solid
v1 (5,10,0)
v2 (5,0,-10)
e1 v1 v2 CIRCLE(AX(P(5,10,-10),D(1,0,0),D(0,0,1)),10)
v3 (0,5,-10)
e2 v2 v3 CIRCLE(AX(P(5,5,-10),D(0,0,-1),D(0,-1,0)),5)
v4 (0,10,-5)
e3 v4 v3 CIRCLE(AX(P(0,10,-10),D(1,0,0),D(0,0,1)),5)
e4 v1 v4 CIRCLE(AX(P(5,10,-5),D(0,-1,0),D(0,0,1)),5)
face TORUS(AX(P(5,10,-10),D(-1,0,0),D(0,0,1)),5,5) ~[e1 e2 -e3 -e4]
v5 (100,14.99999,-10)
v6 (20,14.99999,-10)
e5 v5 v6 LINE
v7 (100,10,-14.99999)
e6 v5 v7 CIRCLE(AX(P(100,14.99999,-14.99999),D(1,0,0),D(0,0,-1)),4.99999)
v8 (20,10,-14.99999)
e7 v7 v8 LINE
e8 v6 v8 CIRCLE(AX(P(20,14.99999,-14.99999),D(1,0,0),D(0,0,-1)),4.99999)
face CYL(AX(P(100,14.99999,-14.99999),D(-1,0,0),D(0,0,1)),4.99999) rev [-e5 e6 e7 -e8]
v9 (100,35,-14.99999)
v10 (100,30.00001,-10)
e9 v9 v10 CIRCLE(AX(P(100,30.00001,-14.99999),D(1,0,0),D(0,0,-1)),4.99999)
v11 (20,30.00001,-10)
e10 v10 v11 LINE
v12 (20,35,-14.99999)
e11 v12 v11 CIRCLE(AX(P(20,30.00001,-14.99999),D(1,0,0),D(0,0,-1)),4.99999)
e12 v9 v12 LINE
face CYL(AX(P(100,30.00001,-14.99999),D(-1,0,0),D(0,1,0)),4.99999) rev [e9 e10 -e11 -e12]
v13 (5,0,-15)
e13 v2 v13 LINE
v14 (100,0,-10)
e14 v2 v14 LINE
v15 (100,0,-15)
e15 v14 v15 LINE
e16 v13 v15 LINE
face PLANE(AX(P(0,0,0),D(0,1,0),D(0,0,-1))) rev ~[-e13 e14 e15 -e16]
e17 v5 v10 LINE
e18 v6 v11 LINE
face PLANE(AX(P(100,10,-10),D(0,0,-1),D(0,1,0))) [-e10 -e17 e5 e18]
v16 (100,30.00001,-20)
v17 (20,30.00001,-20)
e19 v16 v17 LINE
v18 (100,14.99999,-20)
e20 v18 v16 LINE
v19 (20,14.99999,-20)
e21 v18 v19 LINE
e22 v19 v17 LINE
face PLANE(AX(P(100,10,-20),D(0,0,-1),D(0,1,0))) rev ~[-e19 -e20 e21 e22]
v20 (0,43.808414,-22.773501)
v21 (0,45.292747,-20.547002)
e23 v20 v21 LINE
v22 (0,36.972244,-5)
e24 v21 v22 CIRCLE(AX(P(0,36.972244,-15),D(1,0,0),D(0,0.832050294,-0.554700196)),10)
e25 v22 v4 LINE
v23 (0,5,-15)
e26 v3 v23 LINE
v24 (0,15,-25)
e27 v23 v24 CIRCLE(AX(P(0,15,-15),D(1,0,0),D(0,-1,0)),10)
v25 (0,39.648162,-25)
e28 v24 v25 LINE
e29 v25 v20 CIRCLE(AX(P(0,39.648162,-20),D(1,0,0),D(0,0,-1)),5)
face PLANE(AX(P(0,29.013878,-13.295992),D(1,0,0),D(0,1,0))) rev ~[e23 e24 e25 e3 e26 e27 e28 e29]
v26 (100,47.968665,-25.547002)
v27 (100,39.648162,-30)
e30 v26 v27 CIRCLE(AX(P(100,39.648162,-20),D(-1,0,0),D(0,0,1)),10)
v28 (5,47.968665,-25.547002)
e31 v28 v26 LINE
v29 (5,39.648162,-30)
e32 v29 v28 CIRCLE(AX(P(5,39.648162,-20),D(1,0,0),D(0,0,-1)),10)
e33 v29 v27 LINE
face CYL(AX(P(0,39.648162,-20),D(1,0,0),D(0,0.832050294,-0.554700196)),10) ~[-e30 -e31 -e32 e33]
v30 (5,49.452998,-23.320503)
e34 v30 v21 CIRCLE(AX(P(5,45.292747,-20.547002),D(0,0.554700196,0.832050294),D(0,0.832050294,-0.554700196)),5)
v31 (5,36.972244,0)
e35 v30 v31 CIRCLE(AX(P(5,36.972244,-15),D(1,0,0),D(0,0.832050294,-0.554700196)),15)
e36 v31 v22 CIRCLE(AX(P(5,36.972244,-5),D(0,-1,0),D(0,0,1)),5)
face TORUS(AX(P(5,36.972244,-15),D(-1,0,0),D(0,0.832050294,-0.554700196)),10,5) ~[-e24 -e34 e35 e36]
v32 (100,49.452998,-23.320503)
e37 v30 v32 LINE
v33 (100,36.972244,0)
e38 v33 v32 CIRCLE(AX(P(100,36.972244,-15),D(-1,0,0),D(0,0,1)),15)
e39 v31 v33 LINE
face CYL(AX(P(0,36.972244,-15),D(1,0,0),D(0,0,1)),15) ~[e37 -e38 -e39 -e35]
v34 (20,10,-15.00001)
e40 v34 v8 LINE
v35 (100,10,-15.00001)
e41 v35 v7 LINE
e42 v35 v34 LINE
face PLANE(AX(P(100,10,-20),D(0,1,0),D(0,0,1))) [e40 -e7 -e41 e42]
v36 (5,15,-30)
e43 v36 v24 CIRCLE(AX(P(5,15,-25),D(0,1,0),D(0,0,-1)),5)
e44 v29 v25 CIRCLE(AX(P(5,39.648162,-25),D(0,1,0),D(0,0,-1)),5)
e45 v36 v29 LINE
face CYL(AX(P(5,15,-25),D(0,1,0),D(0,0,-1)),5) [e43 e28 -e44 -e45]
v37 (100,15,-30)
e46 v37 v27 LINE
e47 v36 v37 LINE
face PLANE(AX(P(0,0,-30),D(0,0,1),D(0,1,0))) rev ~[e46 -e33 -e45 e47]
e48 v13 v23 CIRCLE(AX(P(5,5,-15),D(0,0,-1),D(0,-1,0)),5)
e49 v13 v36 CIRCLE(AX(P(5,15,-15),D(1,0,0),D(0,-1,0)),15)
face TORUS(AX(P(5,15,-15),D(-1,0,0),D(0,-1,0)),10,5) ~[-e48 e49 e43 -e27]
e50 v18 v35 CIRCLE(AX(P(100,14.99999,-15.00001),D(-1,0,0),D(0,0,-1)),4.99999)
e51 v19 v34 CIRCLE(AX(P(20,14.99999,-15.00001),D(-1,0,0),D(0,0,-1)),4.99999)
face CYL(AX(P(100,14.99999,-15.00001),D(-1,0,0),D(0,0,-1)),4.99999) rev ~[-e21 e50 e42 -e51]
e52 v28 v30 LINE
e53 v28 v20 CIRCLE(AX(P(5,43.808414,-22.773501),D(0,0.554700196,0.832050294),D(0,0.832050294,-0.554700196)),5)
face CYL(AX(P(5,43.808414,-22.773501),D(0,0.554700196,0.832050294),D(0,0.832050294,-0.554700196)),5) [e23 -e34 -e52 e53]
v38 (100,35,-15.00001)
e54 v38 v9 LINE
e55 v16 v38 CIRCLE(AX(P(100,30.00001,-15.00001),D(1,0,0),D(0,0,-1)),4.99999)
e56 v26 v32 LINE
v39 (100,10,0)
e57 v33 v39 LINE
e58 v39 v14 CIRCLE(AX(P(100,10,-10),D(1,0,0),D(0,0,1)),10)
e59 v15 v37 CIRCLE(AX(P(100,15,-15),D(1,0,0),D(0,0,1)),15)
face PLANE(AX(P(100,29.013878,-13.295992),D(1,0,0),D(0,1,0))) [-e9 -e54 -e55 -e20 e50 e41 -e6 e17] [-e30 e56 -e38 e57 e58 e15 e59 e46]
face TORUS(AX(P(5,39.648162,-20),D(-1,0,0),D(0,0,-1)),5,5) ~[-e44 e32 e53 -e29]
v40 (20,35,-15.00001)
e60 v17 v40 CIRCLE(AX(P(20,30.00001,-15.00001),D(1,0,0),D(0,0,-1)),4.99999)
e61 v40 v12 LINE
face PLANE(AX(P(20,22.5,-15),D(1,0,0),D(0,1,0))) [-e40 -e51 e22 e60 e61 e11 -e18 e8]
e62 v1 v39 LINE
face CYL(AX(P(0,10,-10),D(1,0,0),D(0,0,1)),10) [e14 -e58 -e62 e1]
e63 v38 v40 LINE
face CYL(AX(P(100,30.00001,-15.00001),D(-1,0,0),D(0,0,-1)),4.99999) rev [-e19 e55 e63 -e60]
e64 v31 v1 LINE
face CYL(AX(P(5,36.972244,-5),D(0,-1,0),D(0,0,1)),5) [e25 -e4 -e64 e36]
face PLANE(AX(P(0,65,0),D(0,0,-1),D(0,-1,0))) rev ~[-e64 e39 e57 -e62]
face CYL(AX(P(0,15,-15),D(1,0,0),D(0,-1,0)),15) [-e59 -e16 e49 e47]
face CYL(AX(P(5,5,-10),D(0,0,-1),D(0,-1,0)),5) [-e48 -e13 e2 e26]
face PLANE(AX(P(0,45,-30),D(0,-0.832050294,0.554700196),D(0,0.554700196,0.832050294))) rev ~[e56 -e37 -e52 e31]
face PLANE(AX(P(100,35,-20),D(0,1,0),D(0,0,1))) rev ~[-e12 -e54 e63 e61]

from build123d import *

# Parameters (mm, degrees)
F1_DEPTH = 100
F2_R     = 15
F3_W     = 25
F3_H     = 10
F4_DEPTH = 80
F5_R     = 4.99999
F6_R     = 10
F7_R     = 5


# Not quite as in the source:
# - a fillet or chamfer is up to 0.001 mm smaller than in the source, because OpenCascade refuses the exact size


with BuildPart() as f1:
    # F0 (on Right) → F1 (new body)
    with BuildSketch(Plane.YZ):
        Polygon((65, 0), (0, 0), (0, -30), (45, -30), align=None)
    extrude(amount=F1_DEPTH)

    # F2
    f2_edges = [f1.edges().sort_by_distance(p)[0] for p in [
        (50, 65, 0),
        (50, 0, -30),
    ]]
    fillet(f2_edges, radius=F2_R)

    # F3 (on face) → F4 (cut)
    with BuildSketch(Plane.YZ.offset(100)):
        with Locations((22.5, -15)):
            Rectangle(F3_W, F3_H)
    extrude(amount=-F4_DEPTH, mode=Mode.SUBTRACT)

    # F5 (radius 5 in the source; OpenCascade refuses exactly that, so slightly less here)
    f5_edges = [f1.edges().sort_by_distance(p)[0] for p in [
        (60, 10, -10),
        (60, 10, -20),
        (60, 35, -10),
        (60, 35, -20),
    ]]
    fillet(f5_edges, radius=F5_R)

    # F6
    f6_edges = [f1.edges().sort_by_distance(p)[0] for p in [
        (50, 0, 0),
        (50, 45, -30),
    ]]
    fillet(f6_edges, radius=F6_R)

    # F7
    f7_edges = [f1.edges().sort_by_distance(p)[0] for p in [
        (0, 23.486122, 0),
    ]]
    fillet(f7_edges, radius=F7_R)


solid = f1.part
